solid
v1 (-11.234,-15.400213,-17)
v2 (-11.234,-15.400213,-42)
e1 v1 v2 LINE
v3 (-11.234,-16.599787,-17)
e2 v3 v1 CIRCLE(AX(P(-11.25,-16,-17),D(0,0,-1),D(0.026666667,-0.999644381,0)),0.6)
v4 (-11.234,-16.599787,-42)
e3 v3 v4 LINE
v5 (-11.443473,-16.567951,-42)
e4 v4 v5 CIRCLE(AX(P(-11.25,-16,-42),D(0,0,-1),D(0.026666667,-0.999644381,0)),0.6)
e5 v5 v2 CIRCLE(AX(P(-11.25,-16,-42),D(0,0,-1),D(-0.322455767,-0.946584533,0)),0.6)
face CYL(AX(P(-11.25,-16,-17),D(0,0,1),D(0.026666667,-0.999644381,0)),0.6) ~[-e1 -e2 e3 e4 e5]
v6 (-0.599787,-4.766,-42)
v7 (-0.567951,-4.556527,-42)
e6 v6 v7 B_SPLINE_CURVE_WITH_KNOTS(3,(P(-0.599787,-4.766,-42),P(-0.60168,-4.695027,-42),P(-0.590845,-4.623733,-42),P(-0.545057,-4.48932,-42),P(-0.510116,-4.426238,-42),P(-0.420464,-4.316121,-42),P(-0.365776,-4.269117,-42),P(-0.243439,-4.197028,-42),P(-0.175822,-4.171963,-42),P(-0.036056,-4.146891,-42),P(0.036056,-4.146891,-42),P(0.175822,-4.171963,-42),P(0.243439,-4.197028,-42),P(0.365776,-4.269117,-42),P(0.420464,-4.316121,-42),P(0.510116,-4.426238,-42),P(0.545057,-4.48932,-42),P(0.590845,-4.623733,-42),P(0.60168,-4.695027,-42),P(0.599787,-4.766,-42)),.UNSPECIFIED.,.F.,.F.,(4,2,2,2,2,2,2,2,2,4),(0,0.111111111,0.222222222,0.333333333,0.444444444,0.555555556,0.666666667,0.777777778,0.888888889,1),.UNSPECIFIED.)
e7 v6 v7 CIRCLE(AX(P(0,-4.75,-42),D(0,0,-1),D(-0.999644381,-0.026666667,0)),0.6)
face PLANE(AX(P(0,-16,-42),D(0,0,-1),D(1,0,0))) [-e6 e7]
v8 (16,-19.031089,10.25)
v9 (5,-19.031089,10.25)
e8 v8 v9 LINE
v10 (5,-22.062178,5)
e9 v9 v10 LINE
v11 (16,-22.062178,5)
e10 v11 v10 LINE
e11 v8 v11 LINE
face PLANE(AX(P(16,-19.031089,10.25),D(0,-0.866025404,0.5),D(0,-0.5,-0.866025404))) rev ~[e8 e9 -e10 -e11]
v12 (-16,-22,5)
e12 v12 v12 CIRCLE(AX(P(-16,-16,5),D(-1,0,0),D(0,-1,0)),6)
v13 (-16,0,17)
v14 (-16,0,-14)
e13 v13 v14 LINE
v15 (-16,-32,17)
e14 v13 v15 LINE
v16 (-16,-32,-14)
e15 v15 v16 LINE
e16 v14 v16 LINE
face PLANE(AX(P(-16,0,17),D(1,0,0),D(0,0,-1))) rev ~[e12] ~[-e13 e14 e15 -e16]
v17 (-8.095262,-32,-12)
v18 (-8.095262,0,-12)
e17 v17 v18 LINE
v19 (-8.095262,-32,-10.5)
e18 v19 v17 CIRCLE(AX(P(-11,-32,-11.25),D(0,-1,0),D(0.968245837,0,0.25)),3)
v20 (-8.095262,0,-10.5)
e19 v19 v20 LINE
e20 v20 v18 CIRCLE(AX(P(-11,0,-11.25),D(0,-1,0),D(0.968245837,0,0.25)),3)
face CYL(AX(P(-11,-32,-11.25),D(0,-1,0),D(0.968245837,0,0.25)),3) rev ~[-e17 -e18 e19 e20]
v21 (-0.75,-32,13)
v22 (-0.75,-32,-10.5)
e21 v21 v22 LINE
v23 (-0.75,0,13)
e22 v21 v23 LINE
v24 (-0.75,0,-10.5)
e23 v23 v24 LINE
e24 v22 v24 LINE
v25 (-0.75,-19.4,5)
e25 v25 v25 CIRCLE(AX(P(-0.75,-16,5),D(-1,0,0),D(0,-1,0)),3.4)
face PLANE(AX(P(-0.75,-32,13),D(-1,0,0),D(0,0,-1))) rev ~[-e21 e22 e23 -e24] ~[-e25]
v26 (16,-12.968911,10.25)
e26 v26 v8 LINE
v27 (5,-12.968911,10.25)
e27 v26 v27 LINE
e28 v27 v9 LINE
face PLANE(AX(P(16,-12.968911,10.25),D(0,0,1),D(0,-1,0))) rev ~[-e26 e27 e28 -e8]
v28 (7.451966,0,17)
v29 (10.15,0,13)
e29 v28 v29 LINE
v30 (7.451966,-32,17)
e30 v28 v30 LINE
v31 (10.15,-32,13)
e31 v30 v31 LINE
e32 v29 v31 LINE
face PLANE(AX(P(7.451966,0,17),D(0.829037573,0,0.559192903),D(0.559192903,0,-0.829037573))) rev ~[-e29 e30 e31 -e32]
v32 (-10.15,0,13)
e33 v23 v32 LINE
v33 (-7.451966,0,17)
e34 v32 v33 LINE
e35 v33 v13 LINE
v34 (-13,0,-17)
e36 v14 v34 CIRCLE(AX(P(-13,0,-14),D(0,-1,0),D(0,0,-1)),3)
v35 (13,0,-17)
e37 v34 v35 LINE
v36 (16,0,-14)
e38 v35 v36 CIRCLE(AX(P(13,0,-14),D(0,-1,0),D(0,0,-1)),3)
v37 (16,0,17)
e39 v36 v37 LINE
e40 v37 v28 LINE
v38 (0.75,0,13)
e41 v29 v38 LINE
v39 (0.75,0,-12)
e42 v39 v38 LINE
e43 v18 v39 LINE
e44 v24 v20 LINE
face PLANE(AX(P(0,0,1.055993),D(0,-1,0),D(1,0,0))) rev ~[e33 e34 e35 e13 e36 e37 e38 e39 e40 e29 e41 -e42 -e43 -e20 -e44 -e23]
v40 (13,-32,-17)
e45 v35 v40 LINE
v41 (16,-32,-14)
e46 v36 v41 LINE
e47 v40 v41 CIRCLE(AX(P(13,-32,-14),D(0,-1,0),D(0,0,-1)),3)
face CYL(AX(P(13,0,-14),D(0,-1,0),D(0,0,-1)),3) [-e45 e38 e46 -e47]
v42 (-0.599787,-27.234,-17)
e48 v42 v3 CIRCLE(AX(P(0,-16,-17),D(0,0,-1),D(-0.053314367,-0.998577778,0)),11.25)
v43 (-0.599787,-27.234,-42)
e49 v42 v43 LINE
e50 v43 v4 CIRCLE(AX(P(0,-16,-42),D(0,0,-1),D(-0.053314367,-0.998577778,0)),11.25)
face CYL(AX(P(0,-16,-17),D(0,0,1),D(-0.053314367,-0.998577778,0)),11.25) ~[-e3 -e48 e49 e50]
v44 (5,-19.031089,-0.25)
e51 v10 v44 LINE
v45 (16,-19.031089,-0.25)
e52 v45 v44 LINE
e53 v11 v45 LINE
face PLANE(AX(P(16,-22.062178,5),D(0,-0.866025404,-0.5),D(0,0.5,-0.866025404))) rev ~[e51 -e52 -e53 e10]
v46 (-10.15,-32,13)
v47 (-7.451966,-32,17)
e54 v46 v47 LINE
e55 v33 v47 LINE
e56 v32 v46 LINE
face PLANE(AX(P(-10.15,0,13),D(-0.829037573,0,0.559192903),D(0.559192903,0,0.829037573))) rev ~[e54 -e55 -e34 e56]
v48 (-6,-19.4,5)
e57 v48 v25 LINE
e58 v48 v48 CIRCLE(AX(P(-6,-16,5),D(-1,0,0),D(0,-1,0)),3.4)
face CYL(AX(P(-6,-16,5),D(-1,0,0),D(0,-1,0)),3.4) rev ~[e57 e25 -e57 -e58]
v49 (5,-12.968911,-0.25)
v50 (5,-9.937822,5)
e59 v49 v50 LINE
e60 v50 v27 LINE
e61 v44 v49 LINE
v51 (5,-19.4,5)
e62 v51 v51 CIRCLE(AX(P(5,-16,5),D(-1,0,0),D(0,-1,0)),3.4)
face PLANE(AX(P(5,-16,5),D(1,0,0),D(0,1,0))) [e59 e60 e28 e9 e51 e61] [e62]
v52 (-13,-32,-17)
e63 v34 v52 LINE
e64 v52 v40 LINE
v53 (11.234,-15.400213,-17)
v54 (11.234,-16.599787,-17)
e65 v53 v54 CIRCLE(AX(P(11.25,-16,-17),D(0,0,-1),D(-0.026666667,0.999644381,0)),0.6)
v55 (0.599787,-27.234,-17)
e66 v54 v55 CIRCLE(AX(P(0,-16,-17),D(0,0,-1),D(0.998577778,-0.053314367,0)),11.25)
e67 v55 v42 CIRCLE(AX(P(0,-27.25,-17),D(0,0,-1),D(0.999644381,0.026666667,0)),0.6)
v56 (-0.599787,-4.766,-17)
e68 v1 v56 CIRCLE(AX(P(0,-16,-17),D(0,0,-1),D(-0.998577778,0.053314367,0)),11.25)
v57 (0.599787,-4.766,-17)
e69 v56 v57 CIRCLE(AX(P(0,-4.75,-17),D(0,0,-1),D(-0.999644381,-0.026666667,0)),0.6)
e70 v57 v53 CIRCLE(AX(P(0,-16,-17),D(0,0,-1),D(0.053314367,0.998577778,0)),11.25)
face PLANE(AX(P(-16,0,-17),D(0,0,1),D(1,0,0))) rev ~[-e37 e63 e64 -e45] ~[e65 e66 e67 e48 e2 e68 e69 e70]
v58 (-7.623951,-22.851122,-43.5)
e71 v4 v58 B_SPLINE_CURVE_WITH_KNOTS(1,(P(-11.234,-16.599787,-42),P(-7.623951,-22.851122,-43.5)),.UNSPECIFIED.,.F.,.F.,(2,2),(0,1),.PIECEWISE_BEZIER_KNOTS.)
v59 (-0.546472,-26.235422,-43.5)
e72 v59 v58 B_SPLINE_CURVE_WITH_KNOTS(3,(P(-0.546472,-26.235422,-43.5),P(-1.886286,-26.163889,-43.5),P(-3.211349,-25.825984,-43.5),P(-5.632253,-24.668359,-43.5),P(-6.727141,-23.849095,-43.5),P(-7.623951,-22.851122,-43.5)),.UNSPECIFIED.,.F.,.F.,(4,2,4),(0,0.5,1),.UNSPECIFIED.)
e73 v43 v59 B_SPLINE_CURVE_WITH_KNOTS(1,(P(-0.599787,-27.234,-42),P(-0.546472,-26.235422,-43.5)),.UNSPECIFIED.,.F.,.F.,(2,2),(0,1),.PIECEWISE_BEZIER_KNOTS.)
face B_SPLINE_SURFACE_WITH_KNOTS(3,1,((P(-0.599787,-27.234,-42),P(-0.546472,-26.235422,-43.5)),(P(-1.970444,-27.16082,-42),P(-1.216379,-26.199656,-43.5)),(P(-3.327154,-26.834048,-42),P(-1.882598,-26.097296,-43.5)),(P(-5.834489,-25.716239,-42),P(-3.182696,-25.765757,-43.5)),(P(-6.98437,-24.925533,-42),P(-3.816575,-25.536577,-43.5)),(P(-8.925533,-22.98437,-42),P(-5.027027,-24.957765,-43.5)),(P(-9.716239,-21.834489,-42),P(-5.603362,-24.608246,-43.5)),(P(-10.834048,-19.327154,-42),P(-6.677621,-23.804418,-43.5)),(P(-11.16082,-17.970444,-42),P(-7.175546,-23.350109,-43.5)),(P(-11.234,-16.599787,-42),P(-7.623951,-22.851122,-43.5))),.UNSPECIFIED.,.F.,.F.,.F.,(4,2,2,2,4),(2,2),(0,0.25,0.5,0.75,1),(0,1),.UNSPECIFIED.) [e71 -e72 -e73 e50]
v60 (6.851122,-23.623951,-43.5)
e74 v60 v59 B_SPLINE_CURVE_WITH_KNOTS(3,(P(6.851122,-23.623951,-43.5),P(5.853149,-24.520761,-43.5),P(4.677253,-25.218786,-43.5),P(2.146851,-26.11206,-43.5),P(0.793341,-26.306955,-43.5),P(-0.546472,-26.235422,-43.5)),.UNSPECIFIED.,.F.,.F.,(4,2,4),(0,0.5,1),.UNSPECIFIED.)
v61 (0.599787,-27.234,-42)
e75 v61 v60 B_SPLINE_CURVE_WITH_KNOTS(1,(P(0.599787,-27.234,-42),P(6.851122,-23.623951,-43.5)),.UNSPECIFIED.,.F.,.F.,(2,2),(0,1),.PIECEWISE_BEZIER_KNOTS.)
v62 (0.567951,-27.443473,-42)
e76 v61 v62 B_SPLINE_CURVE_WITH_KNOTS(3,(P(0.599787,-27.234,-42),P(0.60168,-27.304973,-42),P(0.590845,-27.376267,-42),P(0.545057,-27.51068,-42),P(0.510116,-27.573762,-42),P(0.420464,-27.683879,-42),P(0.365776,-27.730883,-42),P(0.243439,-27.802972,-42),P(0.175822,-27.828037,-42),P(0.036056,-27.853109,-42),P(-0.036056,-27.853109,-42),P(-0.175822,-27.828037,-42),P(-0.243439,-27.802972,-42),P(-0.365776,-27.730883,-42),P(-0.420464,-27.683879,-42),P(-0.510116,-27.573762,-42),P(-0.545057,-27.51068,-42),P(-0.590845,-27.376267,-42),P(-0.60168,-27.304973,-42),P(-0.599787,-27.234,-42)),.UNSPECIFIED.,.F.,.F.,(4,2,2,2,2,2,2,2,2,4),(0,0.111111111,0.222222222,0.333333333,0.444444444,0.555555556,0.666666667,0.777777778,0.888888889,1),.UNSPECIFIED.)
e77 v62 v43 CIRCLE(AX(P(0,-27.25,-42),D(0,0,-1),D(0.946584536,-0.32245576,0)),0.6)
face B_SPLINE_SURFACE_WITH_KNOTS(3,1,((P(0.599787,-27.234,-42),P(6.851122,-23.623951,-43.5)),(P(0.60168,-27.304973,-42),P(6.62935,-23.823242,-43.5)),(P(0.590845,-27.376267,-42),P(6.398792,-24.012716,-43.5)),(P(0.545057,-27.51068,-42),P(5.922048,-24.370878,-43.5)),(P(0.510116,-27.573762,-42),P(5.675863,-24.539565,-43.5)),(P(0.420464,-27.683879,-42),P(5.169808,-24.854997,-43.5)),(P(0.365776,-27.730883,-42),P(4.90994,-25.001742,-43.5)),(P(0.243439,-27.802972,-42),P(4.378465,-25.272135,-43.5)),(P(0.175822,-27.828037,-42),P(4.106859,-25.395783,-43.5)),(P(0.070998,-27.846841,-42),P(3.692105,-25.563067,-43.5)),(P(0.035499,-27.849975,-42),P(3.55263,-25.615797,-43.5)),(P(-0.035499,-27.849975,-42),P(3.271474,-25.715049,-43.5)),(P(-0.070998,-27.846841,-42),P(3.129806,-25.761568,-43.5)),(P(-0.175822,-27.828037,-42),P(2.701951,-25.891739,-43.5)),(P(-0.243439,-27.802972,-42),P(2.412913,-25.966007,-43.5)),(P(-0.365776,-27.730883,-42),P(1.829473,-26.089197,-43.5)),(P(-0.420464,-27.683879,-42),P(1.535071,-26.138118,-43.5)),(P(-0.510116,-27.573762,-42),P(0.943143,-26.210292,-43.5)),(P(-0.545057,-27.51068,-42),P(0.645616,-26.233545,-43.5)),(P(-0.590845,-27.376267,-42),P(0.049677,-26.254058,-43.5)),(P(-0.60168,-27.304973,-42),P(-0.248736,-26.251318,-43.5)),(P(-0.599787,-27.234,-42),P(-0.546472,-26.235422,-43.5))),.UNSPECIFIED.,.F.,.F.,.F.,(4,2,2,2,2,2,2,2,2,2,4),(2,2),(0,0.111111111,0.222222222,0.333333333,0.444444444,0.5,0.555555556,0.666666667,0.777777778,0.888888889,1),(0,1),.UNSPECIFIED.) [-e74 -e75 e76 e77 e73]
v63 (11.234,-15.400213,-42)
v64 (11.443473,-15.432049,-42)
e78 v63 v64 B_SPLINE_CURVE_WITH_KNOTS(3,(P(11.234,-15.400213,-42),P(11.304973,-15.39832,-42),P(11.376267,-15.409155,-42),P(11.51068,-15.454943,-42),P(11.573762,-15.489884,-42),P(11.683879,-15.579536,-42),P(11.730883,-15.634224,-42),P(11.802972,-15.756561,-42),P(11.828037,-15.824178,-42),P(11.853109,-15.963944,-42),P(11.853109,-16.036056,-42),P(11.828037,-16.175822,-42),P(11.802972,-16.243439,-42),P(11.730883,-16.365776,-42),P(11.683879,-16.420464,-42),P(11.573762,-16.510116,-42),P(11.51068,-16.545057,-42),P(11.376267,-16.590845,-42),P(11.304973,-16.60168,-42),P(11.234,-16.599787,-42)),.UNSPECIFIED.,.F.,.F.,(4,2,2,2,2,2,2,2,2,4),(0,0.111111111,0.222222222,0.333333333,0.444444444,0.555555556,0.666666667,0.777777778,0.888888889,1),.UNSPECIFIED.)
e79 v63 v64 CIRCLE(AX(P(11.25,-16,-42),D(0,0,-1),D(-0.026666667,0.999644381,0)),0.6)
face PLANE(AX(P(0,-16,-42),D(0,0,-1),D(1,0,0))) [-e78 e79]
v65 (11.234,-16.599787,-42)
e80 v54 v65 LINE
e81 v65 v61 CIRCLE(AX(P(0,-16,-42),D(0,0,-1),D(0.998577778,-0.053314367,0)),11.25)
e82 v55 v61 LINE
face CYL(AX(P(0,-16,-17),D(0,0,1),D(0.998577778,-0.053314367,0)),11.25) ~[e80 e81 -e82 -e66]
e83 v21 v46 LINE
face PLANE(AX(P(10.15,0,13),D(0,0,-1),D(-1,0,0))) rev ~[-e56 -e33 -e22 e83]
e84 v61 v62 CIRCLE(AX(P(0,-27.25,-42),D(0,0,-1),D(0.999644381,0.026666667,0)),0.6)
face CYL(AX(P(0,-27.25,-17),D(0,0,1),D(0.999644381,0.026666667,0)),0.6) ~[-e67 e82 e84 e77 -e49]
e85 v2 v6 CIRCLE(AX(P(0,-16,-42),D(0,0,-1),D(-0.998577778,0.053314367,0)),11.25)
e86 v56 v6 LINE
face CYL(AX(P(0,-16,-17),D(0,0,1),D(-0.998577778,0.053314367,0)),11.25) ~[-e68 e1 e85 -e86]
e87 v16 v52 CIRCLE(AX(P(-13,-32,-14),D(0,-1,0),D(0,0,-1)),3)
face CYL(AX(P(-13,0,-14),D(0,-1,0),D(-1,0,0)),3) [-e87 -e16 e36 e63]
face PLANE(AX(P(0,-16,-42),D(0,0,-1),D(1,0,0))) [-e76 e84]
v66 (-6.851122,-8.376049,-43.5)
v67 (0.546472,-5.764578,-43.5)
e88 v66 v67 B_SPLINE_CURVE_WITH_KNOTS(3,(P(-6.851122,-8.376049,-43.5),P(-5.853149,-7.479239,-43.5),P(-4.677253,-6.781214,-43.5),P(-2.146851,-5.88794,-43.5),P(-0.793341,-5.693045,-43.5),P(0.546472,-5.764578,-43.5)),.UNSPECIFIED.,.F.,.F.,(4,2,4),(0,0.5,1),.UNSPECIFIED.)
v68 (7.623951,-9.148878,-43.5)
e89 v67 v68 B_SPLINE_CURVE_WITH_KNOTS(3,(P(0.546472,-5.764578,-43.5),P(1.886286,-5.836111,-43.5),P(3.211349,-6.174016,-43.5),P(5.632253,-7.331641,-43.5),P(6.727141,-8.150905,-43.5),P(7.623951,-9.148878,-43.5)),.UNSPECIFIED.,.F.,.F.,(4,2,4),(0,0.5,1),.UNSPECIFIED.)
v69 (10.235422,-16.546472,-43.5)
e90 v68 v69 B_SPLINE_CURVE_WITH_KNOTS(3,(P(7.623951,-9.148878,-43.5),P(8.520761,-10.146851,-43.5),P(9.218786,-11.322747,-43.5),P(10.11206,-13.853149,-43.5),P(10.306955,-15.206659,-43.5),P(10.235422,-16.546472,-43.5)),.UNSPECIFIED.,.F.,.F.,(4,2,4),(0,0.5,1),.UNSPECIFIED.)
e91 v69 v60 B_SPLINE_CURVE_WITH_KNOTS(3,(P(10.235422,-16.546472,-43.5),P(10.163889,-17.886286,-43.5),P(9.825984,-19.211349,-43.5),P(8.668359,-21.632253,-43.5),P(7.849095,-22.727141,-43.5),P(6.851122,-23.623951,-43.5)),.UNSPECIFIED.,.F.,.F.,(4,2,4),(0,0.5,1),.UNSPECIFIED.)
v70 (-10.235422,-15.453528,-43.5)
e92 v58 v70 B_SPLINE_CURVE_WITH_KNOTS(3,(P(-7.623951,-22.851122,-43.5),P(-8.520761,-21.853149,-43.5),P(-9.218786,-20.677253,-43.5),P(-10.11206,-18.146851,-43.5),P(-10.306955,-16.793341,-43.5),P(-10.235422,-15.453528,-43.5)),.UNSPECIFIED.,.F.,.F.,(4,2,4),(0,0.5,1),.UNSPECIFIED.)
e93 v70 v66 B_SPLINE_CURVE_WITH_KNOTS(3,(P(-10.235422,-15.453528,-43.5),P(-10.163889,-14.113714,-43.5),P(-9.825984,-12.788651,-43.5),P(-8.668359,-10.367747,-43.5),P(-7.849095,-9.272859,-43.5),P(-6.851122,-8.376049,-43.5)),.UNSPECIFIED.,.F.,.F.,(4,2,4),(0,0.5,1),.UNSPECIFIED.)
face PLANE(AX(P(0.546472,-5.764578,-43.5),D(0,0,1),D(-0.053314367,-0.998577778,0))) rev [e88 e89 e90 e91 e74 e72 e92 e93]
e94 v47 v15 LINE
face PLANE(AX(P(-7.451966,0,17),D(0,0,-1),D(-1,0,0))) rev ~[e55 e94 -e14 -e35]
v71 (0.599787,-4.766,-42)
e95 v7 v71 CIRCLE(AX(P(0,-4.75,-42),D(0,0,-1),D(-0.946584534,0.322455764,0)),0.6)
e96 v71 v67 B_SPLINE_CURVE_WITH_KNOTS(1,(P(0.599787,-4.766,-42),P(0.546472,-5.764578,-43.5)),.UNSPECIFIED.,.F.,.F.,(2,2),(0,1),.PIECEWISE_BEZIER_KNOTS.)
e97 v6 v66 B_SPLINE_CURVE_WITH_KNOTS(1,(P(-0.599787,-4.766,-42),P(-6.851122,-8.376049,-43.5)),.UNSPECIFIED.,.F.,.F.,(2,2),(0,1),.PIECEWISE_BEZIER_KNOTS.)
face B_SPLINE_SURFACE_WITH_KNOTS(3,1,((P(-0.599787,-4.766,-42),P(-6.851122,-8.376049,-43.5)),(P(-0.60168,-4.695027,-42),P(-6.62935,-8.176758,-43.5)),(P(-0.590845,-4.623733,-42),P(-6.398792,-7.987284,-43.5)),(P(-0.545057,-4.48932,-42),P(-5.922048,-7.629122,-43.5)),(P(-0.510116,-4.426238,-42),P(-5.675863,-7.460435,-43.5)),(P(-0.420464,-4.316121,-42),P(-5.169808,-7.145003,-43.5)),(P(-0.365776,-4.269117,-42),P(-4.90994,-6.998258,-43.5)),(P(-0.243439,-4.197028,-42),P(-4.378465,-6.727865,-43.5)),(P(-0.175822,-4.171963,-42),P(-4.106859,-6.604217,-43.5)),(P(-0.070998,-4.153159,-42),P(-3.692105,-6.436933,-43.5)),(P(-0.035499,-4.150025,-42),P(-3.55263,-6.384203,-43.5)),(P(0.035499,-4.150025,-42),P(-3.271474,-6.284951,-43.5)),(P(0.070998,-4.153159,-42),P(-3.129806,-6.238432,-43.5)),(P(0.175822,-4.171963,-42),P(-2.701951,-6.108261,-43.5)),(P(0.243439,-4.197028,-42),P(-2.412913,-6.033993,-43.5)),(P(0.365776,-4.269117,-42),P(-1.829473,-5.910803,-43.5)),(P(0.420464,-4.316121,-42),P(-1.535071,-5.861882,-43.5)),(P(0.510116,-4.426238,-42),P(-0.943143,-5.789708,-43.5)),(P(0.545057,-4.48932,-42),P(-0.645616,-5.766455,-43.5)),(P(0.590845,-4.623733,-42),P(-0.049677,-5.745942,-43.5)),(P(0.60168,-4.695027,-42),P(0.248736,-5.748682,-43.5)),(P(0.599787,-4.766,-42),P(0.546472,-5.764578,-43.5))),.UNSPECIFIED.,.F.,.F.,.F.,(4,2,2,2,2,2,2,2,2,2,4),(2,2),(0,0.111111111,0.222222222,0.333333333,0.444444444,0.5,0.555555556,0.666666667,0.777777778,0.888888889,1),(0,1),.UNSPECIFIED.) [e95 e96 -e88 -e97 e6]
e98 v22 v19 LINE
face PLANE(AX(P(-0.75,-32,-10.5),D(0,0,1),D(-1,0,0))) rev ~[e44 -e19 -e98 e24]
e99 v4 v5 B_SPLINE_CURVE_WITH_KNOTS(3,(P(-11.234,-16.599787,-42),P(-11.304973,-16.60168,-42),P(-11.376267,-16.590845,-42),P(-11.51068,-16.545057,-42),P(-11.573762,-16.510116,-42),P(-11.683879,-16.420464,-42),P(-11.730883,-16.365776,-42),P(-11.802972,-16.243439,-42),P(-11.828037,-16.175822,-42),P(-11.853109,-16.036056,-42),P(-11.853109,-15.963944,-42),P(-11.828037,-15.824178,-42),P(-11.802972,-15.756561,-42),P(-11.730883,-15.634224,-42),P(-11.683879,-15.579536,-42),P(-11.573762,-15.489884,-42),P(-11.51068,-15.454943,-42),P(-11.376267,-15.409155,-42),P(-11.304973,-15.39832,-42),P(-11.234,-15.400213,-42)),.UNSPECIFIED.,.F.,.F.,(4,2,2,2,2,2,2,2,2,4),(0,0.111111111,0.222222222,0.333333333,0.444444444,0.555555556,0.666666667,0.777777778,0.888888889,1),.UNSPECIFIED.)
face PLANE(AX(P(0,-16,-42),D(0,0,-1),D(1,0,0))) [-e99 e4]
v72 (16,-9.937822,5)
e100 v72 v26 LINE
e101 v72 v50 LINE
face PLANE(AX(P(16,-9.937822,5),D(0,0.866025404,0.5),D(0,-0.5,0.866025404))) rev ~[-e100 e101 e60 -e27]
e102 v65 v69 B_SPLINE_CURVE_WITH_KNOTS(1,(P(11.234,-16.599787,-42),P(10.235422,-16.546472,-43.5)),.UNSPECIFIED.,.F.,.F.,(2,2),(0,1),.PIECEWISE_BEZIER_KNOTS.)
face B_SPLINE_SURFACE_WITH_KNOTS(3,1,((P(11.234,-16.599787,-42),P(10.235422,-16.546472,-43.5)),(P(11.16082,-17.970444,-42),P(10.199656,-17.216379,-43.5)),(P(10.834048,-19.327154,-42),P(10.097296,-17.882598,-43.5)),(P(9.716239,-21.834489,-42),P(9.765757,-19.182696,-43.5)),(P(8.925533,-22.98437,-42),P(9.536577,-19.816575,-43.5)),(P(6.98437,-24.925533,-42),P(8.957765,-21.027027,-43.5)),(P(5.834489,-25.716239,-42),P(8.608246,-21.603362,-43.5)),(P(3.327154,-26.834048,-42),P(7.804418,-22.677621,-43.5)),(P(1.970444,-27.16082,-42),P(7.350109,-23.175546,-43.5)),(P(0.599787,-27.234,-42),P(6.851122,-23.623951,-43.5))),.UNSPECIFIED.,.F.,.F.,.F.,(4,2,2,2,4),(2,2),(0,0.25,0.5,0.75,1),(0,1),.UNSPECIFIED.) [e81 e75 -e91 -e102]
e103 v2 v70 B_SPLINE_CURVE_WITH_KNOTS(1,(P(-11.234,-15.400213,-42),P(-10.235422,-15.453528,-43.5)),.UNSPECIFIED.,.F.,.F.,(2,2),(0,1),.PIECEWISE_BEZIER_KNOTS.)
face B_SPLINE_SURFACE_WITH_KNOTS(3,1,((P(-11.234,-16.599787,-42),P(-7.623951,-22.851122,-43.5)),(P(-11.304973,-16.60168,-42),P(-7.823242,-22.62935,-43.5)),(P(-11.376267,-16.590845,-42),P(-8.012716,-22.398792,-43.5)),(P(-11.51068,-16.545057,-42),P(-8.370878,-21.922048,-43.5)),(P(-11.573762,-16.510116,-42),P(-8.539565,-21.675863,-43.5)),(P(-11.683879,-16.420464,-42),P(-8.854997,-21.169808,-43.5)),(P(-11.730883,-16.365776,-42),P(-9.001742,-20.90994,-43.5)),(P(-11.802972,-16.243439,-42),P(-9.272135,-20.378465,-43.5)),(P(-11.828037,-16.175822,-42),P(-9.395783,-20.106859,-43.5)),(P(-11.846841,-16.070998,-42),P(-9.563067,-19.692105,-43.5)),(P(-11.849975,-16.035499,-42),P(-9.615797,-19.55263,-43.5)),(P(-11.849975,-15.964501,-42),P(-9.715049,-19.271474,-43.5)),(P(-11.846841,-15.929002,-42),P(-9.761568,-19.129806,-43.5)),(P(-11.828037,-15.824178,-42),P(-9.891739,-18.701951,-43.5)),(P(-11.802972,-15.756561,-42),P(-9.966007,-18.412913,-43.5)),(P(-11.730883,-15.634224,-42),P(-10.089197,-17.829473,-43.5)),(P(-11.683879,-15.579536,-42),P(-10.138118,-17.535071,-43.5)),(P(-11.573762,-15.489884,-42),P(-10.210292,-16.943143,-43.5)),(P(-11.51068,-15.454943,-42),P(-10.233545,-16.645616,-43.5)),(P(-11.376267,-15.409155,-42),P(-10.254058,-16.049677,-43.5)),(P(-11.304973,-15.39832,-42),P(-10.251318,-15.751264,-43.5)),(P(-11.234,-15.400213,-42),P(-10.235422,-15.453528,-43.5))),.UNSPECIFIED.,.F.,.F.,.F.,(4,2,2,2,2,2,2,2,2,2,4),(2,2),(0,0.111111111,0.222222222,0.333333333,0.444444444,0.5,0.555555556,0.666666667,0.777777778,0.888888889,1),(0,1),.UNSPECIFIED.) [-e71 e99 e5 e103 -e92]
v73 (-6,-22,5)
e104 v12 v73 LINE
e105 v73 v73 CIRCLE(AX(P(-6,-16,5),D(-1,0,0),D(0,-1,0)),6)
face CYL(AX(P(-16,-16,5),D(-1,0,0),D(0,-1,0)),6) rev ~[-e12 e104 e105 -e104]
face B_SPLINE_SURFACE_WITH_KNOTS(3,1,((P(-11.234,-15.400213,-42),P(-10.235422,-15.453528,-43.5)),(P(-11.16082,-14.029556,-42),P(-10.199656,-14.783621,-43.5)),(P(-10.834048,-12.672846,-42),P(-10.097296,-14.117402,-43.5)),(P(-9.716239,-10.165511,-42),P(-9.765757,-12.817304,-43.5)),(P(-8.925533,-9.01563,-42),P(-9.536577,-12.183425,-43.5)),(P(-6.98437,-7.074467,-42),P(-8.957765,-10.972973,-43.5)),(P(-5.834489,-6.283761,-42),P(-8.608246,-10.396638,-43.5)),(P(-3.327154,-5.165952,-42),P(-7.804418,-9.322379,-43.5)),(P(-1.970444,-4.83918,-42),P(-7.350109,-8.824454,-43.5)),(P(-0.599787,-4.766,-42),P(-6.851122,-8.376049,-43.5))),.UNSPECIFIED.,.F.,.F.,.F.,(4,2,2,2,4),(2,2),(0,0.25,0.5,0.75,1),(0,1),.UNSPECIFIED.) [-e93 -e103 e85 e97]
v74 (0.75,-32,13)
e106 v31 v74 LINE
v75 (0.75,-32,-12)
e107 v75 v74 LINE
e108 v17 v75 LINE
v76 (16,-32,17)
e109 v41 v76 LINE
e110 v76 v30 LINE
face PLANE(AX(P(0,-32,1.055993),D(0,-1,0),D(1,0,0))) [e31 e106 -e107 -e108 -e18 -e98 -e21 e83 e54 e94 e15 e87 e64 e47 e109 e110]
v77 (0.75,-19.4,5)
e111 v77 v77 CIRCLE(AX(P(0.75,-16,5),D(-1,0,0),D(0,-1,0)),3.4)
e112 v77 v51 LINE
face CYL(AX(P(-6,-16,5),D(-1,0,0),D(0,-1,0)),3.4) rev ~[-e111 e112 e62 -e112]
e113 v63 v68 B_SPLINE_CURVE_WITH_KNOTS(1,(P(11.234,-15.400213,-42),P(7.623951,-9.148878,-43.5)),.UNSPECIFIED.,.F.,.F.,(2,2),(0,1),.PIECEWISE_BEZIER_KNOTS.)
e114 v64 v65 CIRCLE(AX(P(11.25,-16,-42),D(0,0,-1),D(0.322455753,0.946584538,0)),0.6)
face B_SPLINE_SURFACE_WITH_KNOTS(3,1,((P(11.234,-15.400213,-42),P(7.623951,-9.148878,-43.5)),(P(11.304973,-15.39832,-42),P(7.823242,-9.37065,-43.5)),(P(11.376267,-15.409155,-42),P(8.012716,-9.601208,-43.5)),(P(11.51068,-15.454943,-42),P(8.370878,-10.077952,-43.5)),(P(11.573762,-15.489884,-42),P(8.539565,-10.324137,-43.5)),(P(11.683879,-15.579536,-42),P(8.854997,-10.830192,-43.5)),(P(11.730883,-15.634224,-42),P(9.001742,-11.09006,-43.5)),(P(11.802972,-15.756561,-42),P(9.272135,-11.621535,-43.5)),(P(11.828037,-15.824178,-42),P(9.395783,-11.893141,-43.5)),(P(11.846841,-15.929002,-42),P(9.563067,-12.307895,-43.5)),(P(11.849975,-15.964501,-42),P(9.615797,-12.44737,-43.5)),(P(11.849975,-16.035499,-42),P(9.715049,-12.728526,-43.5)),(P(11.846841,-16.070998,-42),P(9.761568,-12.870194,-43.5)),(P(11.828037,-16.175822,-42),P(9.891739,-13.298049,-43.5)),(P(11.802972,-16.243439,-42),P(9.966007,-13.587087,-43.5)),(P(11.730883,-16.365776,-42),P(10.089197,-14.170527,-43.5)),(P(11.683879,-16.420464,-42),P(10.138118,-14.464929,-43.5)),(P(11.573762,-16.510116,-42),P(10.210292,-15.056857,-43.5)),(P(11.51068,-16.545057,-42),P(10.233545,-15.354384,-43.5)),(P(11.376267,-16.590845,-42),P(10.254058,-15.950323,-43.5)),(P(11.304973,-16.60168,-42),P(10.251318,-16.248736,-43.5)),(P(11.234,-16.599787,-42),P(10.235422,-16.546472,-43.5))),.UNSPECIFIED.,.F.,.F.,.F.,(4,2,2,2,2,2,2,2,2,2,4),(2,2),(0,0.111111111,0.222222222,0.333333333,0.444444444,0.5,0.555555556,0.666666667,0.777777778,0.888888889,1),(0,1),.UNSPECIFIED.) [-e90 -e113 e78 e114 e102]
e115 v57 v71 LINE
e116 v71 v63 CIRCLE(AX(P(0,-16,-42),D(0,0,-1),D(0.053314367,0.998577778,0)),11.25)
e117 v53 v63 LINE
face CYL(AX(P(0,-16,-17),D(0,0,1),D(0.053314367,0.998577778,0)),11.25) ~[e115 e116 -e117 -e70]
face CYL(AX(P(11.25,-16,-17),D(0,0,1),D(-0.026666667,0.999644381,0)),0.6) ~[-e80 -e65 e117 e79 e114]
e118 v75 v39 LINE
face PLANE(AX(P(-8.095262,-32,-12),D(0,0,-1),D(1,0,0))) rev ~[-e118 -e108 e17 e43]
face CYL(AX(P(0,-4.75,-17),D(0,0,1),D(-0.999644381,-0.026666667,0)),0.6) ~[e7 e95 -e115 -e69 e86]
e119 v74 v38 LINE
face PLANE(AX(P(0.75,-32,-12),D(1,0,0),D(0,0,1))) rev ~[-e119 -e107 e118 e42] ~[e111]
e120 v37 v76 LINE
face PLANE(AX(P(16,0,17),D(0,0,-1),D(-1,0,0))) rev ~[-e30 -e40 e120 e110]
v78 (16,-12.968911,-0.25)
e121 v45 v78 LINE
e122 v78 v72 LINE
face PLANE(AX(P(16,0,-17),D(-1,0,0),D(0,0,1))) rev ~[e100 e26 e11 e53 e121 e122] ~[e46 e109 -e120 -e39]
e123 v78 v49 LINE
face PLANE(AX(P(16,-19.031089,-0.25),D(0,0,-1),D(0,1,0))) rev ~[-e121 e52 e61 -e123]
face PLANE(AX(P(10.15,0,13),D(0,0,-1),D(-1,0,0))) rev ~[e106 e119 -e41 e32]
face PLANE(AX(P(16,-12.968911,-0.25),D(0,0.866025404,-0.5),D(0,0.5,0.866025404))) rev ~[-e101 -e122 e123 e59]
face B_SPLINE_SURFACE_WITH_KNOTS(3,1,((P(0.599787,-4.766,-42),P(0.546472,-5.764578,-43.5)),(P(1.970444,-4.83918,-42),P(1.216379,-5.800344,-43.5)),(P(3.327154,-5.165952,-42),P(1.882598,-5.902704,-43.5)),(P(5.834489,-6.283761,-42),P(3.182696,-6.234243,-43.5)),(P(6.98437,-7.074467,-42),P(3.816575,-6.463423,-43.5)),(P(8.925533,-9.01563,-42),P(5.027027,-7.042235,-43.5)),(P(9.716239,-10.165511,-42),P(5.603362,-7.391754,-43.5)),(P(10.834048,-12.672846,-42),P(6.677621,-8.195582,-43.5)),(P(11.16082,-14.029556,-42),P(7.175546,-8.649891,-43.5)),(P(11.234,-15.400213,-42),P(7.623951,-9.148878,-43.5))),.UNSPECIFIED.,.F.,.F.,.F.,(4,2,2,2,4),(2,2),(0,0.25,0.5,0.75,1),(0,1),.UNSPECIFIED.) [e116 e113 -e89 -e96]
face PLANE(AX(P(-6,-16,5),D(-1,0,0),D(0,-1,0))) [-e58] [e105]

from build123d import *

# Parameters (mm, degrees)
F1_DEPTH  = 32
F2_R      = 6
F3_DEPTH  = 10
F4_R      = 3.4
F5_DEPTH  = 22.001
F7_DEPTH  = 32.001
F9_DEPTH  = 11
F11_DEPTH = 25
F12_R     = 3
F13_R     = 3


# Not quite as in the source:
# - the arcs of a loft's sections are written as splines that run evenly, so that the points pair up as in the source's solid


with BuildPart() as f1:
    # F0 (on Front) → F1 (new body)
    with BuildSketch(Plane.XZ):
        Polygon((-16, 17), (-16, -17), (16, -17), (16, 17), (7.4519659326, 17), (10.15, 13), (-10.15, 13), (-7.4519659326, 17), align=None)
    extrude(amount=F1_DEPTH)

    # F2 (on face) → F3 (cut)
    with BuildSketch(Plane(origin=(-16, 0, 0), x_dir=(0, -1, 0), z_dir=(-1, 0, 0))):
        with Locations((16, 5)):
            Circle(F2_R)
    extrude(amount=-F3_DEPTH, mode=Mode.SUBTRACT)

    # F4 (on face) → F5 (cut, through all)
    with BuildSketch(Plane(origin=(-6, 0, 0), x_dir=(0, -1, 0), z_dir=(-1, 0, 0))):
        with Locations((16, 5)):
            Circle(F4_R)
    extrude(amount=-F5_DEPTH, mode=Mode.SUBTRACT)

    # F6 (on face) → F7 (cut, through all)
    with BuildSketch(Plane.XZ.offset(32)):
        with BuildLine():
            Line((0.75, 13), (-0.75, 13))
            Line((-0.75, 13), (-0.75, -10.5))
            Line((-0.75, -10.5), (-8.0952624903, -10.5))
            ThreePointArc((-8.0952624903, -10.5), (-14, -11.25), (-8.0952624903, -12))
            Line((-8.0952624903, -12), (0.75, -12))
            Line((0.75, -12), (0.75, 13))
        make_face()
    extrude(amount=-F7_DEPTH, mode=Mode.SUBTRACT)

    # F8 (on face) → F9 (cut)
    with BuildSketch(Plane.YZ.offset(16)):
        Polygon((-12.9689110868, -0.25), (-9.9378221735, 5), (-12.9689110868, 10.25), (-19.0310889132, 10.25), (-22.0621778265, 5), (-19.0310889132, -0.25), align=None)
    extrude(amount=-F9_DEPTH, mode=Mode.SUBTRACT)

    # F10 (on face) → F11 (join)
    with BuildSketch(Plane(origin=(0, 0, -17), x_dir=(1, 0, 0), z_dir=(0, 0, -1))):
        with BuildLine():
            ThreePointArc((11.234, 15.4002133713), (11.85, 16), (11.234, 16.5997866287))
            ThreePointArc((11.234, 16.5997866287), (7.9549512883, 23.9549512883), (0.5997866287, 27.234))
            ThreePointArc((0.5997866287, 27.234), (0, 27.85), (-0.5997866287, 27.234))
            ThreePointArc((-0.5997866287, 27.234), (-7.9549512883, 23.9549512883), (-11.234, 16.5997866287))
            ThreePointArc((-11.234, 16.5997866287), (-11.85, 16), (-11.234, 15.4002133713))
            ThreePointArc((-11.234, 15.4002133713), (-7.9549512883, 8.0450487117), (-0.5997866287, 4.766))
            ThreePointArc((-0.5997866287, 4.766), (0, 4.15), (0.5997866287, 4.766))
            ThreePointArc((0.5997866287, 4.766), (7.9549512883, 8.0450487117), (11.234, 15.4002133713))
        make_face()
    extrude(amount=F11_DEPTH)

    # F12
    f12_edges = [f1.edges().sort_by_distance(p)[0] for p in [
        (-16, -16, -17),
    ]]
    fillet(f12_edges, radius=F12_R)

    # F13
    f13_edges = [f1.edges().sort_by_distance(p)[0] for p in [
        (16, -16, -17),
    ]]
    fillet(f13_edges, radius=F13_R)

    # F11_face (on face) → F16 section 0
    with BuildSketch(Plane(origin=(0, -16, -42), x_dir=(1, 0, 0), z_dir=(0, 0, -1))):
        with BuildLine():
            add(Edge.make_bspline(
                [(0.5997866287, -11.234), (1.9704441734, -11.1608201827), (3.3271537618, -10.8340484232), (5.834489174, -9.7162386482), (6.984369661, -8.9255329157), (8.9255329157, -6.984369661), (9.7162386482, -5.834489174), (10.8340484232, -3.3271537618), (11.1608201827, -1.9704441734), (11.234, -0.5997866287)],
                knots=[0, 0, 0, 0, 0.25, 0.25, 0.5, 0.5, 0.75, 0.75, 1, 1, 1, 1], degree=3))
            add(Edge.make_bspline(
                [(11.234, -0.5997866287), (11.3049732474, -0.6016799219), (11.376267359, -0.5908445992), (11.5106795168, -0.5450568557), (11.5737621993, -0.5101164815), (11.6838785828, -0.4204642218), (11.7308833124, -0.3657759235), (11.8029722112, -0.2434389451), (11.8280374139, -0.1758224517), (11.853109213, -0.0360563953), (11.853109213, 0.0360563953), (11.8280374139, 0.1758224517), (11.8029722112, 0.2434389451), (11.7308833124, 0.3657759235), (11.6838785828, 0.4204642218), (11.5737621993, 0.5101164815), (11.5106795168, 0.5450568557), (11.376267359, 0.5908445992), (11.3049732474, 0.6016799219), (11.234, 0.5997866287)],
                knots=[0, 0, 0, 0, 0.1111111111, 0.1111111111, 0.2222222222, 0.2222222222, 0.3333333333, 0.3333333333, 0.4444444444, 0.4444444444, 0.5555555556, 0.5555555556, 0.6666666667, 0.6666666667, 0.7777777778, 0.7777777778, 0.8888888889, 0.8888888889, 1, 1, 1, 1], degree=3))
            add(Edge.make_bspline(
                [(11.234, 0.5997866287), (11.1608201827, 1.9704441734), (10.8340484232, 3.3271537618), (9.7162386482, 5.834489174), (8.9255329157, 6.984369661), (6.984369661, 8.9255329157), (5.834489174, 9.7162386482), (3.3271537618, 10.8340484232), (1.9704441734, 11.1608201827), (0.5997866287, 11.234)],
                knots=[0, 0, 0, 0, 0.25, 0.25, 0.5, 0.5, 0.75, 0.75, 1, 1, 1, 1], degree=3))
            add(Edge.make_bspline(
                [(0.5997866287, 11.234), (0.6016799219, 11.3049732474), (0.5908445992, 11.376267359), (0.5450568557, 11.5106795168), (0.5101164815, 11.5737621993), (0.4204642218, 11.6838785828), (0.3657759235, 11.7308833124), (0.2434389451, 11.8029722112), (0.1758224517, 11.8280374139), (0.0360563953, 11.853109213), (-0.0360563953, 11.853109213), (-0.1758224517, 11.8280374139), (-0.2434389451, 11.8029722112), (-0.3657759235, 11.7308833124), (-0.4204642218, 11.6838785828), (-0.5101164815, 11.5737621993), (-0.5450568557, 11.5106795168), (-0.5908445992, 11.376267359), (-0.6016799219, 11.3049732474), (-0.5997866287, 11.234)],
                knots=[0, 0, 0, 0, 0.1111111111, 0.1111111111, 0.2222222222, 0.2222222222, 0.3333333333, 0.3333333333, 0.4444444444, 0.4444444444, 0.5555555556, 0.5555555556, 0.6666666667, 0.6666666667, 0.7777777778, 0.7777777778, 0.8888888889, 0.8888888889, 1, 1, 1, 1], degree=3))
            add(Edge.make_bspline(
                [(-0.5997866287, 11.234), (-1.9704441734, 11.1608201827), (-3.3271537618, 10.8340484232), (-5.834489174, 9.7162386482), (-6.984369661, 8.9255329157), (-8.9255329157, 6.984369661), (-9.7162386482, 5.834489174), (-10.8340484232, 3.3271537618), (-11.1608201827, 1.9704441734), (-11.234, 0.5997866287)],
                knots=[0, 0, 0, 0, 0.25, 0.25, 0.5, 0.5, 0.75, 0.75, 1, 1, 1, 1], degree=3))
            add(Edge.make_bspline(
                [(-11.234, 0.5997866287), (-11.3049732474, 0.6016799219), (-11.376267359, 0.5908445992), (-11.5106795168, 0.5450568557), (-11.5737621993, 0.5101164815), (-11.6838785828, 0.4204642218), (-11.7308833124, 0.3657759235), (-11.8029722112, 0.2434389451), (-11.8280374139, 0.1758224517), (-11.853109213, 0.0360563953), (-11.853109213, -0.0360563953), (-11.8280374139, -0.1758224517), (-11.8029722112, -0.2434389451), (-11.7308833124, -0.3657759235), (-11.6838785828, -0.4204642218), (-11.5737621993, -0.5101164815), (-11.5106795168, -0.5450568557), (-11.376267359, -0.5908445992), (-11.3049732474, -0.6016799219), (-11.234, -0.5997866287)],
                knots=[0, 0, 0, 0, 0.1111111111, 0.1111111111, 0.2222222222, 0.2222222222, 0.3333333333, 0.3333333333, 0.4444444444, 0.4444444444, 0.5555555556, 0.5555555556, 0.6666666667, 0.6666666667, 0.7777777778, 0.7777777778, 0.8888888889, 0.8888888889, 1, 1, 1, 1], degree=3))
            add(Edge.make_bspline(
                [(-11.234, -0.5997866287), (-11.1608201827, -1.9704441734), (-10.8340484232, -3.3271537618), (-9.7162386482, -5.834489174), (-8.9255329157, -6.984369661), (-6.984369661, -8.9255329157), (-5.834489174, -9.7162386482), (-3.3271537618, -10.8340484232), (-1.9704441734, -11.1608201827), (-0.5997866287, -11.234)],
                knots=[0, 0, 0, 0, 0.25, 0.25, 0.5, 0.5, 0.75, 0.75, 1, 1, 1, 1], degree=3))
            add(Edge.make_bspline(
                [(-0.5997866287, -11.234), (-0.6016799219, -11.3049732474), (-0.5908445992, -11.376267359), (-0.5450568557, -11.5106795168), (-0.5101164815, -11.5737621993), (-0.4204642218, -11.6838785828), (-0.3657759235, -11.7308833124), (-0.2434389451, -11.8029722112), (-0.1758224517, -11.8280374139), (-0.0360563953, -11.853109213), (0.0360563953, -11.853109213), (0.1758224517, -11.8280374139), (0.2434389451, -11.8029722112), (0.3657759235, -11.7308833124), (0.4204642218, -11.6838785828), (0.5101164815, -11.5737621993), (0.5450568557, -11.5106795168), (0.5908445992, -11.376267359), (0.6016799219, -11.3049732474), (0.5997866287, -11.234)],
                knots=[0, 0, 0, 0, 0.1111111111, 0.1111111111, 0.2222222222, 0.2222222222, 0.3333333333, 0.3333333333, 0.4444444444, 0.4444444444, 0.5555555556, 0.5555555556, 0.6666666667, 0.6666666667, 0.7777777778, 0.7777777778, 0.8888888889, 0.8888888889, 1, 1, 1, 1], degree=3))
        make_face()
    # F15 (on offset) → F16 section 1
    with BuildSketch(Plane(origin=(0, 0, -43.5), x_dir=(1, 0, 0), z_dir=(0, 0, -1))):
        with BuildLine():
            add(Edge.make_bspline(
                [(0.5464722617, 5.7645777778), (1.8862858976, 5.8361108296), (3.2113491637, 6.1740163798), (5.6322529271, 7.3316411864), (6.7271409022, 8.1509049669), (7.6239507036, 9.1488777804)],
                knots=[0, 0, 0, 0, 0.5, 0.5, 1, 1, 1, 1], degree=3))
            add(Edge.make_bspline(
                [(7.6239507036, 9.1488777804), (8.5207605051, 10.1468505938), (9.2187864201, 11.3227471207), (10.112059537, 13.8531489393), (10.306955274, 15.2066586259), (10.2354222222, 16.5464722617)],
                knots=[0, 0, 0, 0, 0.5, 0.5, 1, 1, 1, 1], degree=3))
            add(Edge.make_bspline(
                [(10.2354222222, 16.5464722617), (10.1638891704, 17.8862858976), (9.8259836202, 19.2113491637), (8.6683588136, 21.6322529271), (7.8490950331, 22.7271409022), (6.8511222196, 23.6239507036)],
                knots=[0, 0, 0, 0, 0.5, 0.5, 1, 1, 1, 1], degree=3))
            add(Edge.make_bspline(
                [(6.8511222196, 23.6239507036), (5.8531494062, 24.5207605051), (4.6772528793, 25.2187864201), (2.1468510607, 26.112059537), (0.7933413741, 26.306955274), (-0.5464722617, 26.2354222222)],
                knots=[0, 0, 0, 0, 0.5, 0.5, 1, 1, 1, 1], degree=3))
            add(Edge.make_bspline(
                [(-0.5464722617, 26.2354222222), (-1.8862858976, 26.1638891704), (-3.2113491637, 25.8259836202), (-5.6322529271, 24.6683588136), (-6.7271409022, 23.8490950331), (-7.6239507036, 22.8511222196)],
                knots=[0, 0, 0, 0, 0.5, 0.5, 1, 1, 1, 1], degree=3))
            add(Edge.make_bspline(
                [(-7.6239507036, 22.8511222196), (-8.5207605051, 21.8531494062), (-9.2187864201, 20.6772528793), (-10.112059537, 18.1468510607), (-10.306955274, 16.7933413741), (-10.2354222222, 15.4535277383)],
                knots=[0, 0, 0, 0, 0.5, 0.5, 1, 1, 1, 1], degree=3))
            add(Edge.make_bspline(
                [(-10.2354222222, 15.4535277383), (-10.1638891704, 14.1137141024), (-9.8259836202, 12.7886508363), (-8.6683588136, 10.3677470729), (-7.8490950331, 9.2728590978), (-6.8511222196, 8.3760492964)],
                knots=[0, 0, 0, 0, 0.5, 0.5, 1, 1, 1, 1], degree=3))
            add(Edge.make_bspline(
                [(-6.8511222196, 8.3760492964), (-5.8531494062, 7.4792394949), (-4.6772528793, 6.7812135799), (-2.1468510607, 5.887940463), (-0.7933413741, 5.693044726), (0.5464722617, 5.7645777778)],
                knots=[0, 0, 0, 0, 0.5, 0.5, 1, 1, 1, 1], degree=3))
        make_face()
    loft(ruled=True)


solid = f1.part
